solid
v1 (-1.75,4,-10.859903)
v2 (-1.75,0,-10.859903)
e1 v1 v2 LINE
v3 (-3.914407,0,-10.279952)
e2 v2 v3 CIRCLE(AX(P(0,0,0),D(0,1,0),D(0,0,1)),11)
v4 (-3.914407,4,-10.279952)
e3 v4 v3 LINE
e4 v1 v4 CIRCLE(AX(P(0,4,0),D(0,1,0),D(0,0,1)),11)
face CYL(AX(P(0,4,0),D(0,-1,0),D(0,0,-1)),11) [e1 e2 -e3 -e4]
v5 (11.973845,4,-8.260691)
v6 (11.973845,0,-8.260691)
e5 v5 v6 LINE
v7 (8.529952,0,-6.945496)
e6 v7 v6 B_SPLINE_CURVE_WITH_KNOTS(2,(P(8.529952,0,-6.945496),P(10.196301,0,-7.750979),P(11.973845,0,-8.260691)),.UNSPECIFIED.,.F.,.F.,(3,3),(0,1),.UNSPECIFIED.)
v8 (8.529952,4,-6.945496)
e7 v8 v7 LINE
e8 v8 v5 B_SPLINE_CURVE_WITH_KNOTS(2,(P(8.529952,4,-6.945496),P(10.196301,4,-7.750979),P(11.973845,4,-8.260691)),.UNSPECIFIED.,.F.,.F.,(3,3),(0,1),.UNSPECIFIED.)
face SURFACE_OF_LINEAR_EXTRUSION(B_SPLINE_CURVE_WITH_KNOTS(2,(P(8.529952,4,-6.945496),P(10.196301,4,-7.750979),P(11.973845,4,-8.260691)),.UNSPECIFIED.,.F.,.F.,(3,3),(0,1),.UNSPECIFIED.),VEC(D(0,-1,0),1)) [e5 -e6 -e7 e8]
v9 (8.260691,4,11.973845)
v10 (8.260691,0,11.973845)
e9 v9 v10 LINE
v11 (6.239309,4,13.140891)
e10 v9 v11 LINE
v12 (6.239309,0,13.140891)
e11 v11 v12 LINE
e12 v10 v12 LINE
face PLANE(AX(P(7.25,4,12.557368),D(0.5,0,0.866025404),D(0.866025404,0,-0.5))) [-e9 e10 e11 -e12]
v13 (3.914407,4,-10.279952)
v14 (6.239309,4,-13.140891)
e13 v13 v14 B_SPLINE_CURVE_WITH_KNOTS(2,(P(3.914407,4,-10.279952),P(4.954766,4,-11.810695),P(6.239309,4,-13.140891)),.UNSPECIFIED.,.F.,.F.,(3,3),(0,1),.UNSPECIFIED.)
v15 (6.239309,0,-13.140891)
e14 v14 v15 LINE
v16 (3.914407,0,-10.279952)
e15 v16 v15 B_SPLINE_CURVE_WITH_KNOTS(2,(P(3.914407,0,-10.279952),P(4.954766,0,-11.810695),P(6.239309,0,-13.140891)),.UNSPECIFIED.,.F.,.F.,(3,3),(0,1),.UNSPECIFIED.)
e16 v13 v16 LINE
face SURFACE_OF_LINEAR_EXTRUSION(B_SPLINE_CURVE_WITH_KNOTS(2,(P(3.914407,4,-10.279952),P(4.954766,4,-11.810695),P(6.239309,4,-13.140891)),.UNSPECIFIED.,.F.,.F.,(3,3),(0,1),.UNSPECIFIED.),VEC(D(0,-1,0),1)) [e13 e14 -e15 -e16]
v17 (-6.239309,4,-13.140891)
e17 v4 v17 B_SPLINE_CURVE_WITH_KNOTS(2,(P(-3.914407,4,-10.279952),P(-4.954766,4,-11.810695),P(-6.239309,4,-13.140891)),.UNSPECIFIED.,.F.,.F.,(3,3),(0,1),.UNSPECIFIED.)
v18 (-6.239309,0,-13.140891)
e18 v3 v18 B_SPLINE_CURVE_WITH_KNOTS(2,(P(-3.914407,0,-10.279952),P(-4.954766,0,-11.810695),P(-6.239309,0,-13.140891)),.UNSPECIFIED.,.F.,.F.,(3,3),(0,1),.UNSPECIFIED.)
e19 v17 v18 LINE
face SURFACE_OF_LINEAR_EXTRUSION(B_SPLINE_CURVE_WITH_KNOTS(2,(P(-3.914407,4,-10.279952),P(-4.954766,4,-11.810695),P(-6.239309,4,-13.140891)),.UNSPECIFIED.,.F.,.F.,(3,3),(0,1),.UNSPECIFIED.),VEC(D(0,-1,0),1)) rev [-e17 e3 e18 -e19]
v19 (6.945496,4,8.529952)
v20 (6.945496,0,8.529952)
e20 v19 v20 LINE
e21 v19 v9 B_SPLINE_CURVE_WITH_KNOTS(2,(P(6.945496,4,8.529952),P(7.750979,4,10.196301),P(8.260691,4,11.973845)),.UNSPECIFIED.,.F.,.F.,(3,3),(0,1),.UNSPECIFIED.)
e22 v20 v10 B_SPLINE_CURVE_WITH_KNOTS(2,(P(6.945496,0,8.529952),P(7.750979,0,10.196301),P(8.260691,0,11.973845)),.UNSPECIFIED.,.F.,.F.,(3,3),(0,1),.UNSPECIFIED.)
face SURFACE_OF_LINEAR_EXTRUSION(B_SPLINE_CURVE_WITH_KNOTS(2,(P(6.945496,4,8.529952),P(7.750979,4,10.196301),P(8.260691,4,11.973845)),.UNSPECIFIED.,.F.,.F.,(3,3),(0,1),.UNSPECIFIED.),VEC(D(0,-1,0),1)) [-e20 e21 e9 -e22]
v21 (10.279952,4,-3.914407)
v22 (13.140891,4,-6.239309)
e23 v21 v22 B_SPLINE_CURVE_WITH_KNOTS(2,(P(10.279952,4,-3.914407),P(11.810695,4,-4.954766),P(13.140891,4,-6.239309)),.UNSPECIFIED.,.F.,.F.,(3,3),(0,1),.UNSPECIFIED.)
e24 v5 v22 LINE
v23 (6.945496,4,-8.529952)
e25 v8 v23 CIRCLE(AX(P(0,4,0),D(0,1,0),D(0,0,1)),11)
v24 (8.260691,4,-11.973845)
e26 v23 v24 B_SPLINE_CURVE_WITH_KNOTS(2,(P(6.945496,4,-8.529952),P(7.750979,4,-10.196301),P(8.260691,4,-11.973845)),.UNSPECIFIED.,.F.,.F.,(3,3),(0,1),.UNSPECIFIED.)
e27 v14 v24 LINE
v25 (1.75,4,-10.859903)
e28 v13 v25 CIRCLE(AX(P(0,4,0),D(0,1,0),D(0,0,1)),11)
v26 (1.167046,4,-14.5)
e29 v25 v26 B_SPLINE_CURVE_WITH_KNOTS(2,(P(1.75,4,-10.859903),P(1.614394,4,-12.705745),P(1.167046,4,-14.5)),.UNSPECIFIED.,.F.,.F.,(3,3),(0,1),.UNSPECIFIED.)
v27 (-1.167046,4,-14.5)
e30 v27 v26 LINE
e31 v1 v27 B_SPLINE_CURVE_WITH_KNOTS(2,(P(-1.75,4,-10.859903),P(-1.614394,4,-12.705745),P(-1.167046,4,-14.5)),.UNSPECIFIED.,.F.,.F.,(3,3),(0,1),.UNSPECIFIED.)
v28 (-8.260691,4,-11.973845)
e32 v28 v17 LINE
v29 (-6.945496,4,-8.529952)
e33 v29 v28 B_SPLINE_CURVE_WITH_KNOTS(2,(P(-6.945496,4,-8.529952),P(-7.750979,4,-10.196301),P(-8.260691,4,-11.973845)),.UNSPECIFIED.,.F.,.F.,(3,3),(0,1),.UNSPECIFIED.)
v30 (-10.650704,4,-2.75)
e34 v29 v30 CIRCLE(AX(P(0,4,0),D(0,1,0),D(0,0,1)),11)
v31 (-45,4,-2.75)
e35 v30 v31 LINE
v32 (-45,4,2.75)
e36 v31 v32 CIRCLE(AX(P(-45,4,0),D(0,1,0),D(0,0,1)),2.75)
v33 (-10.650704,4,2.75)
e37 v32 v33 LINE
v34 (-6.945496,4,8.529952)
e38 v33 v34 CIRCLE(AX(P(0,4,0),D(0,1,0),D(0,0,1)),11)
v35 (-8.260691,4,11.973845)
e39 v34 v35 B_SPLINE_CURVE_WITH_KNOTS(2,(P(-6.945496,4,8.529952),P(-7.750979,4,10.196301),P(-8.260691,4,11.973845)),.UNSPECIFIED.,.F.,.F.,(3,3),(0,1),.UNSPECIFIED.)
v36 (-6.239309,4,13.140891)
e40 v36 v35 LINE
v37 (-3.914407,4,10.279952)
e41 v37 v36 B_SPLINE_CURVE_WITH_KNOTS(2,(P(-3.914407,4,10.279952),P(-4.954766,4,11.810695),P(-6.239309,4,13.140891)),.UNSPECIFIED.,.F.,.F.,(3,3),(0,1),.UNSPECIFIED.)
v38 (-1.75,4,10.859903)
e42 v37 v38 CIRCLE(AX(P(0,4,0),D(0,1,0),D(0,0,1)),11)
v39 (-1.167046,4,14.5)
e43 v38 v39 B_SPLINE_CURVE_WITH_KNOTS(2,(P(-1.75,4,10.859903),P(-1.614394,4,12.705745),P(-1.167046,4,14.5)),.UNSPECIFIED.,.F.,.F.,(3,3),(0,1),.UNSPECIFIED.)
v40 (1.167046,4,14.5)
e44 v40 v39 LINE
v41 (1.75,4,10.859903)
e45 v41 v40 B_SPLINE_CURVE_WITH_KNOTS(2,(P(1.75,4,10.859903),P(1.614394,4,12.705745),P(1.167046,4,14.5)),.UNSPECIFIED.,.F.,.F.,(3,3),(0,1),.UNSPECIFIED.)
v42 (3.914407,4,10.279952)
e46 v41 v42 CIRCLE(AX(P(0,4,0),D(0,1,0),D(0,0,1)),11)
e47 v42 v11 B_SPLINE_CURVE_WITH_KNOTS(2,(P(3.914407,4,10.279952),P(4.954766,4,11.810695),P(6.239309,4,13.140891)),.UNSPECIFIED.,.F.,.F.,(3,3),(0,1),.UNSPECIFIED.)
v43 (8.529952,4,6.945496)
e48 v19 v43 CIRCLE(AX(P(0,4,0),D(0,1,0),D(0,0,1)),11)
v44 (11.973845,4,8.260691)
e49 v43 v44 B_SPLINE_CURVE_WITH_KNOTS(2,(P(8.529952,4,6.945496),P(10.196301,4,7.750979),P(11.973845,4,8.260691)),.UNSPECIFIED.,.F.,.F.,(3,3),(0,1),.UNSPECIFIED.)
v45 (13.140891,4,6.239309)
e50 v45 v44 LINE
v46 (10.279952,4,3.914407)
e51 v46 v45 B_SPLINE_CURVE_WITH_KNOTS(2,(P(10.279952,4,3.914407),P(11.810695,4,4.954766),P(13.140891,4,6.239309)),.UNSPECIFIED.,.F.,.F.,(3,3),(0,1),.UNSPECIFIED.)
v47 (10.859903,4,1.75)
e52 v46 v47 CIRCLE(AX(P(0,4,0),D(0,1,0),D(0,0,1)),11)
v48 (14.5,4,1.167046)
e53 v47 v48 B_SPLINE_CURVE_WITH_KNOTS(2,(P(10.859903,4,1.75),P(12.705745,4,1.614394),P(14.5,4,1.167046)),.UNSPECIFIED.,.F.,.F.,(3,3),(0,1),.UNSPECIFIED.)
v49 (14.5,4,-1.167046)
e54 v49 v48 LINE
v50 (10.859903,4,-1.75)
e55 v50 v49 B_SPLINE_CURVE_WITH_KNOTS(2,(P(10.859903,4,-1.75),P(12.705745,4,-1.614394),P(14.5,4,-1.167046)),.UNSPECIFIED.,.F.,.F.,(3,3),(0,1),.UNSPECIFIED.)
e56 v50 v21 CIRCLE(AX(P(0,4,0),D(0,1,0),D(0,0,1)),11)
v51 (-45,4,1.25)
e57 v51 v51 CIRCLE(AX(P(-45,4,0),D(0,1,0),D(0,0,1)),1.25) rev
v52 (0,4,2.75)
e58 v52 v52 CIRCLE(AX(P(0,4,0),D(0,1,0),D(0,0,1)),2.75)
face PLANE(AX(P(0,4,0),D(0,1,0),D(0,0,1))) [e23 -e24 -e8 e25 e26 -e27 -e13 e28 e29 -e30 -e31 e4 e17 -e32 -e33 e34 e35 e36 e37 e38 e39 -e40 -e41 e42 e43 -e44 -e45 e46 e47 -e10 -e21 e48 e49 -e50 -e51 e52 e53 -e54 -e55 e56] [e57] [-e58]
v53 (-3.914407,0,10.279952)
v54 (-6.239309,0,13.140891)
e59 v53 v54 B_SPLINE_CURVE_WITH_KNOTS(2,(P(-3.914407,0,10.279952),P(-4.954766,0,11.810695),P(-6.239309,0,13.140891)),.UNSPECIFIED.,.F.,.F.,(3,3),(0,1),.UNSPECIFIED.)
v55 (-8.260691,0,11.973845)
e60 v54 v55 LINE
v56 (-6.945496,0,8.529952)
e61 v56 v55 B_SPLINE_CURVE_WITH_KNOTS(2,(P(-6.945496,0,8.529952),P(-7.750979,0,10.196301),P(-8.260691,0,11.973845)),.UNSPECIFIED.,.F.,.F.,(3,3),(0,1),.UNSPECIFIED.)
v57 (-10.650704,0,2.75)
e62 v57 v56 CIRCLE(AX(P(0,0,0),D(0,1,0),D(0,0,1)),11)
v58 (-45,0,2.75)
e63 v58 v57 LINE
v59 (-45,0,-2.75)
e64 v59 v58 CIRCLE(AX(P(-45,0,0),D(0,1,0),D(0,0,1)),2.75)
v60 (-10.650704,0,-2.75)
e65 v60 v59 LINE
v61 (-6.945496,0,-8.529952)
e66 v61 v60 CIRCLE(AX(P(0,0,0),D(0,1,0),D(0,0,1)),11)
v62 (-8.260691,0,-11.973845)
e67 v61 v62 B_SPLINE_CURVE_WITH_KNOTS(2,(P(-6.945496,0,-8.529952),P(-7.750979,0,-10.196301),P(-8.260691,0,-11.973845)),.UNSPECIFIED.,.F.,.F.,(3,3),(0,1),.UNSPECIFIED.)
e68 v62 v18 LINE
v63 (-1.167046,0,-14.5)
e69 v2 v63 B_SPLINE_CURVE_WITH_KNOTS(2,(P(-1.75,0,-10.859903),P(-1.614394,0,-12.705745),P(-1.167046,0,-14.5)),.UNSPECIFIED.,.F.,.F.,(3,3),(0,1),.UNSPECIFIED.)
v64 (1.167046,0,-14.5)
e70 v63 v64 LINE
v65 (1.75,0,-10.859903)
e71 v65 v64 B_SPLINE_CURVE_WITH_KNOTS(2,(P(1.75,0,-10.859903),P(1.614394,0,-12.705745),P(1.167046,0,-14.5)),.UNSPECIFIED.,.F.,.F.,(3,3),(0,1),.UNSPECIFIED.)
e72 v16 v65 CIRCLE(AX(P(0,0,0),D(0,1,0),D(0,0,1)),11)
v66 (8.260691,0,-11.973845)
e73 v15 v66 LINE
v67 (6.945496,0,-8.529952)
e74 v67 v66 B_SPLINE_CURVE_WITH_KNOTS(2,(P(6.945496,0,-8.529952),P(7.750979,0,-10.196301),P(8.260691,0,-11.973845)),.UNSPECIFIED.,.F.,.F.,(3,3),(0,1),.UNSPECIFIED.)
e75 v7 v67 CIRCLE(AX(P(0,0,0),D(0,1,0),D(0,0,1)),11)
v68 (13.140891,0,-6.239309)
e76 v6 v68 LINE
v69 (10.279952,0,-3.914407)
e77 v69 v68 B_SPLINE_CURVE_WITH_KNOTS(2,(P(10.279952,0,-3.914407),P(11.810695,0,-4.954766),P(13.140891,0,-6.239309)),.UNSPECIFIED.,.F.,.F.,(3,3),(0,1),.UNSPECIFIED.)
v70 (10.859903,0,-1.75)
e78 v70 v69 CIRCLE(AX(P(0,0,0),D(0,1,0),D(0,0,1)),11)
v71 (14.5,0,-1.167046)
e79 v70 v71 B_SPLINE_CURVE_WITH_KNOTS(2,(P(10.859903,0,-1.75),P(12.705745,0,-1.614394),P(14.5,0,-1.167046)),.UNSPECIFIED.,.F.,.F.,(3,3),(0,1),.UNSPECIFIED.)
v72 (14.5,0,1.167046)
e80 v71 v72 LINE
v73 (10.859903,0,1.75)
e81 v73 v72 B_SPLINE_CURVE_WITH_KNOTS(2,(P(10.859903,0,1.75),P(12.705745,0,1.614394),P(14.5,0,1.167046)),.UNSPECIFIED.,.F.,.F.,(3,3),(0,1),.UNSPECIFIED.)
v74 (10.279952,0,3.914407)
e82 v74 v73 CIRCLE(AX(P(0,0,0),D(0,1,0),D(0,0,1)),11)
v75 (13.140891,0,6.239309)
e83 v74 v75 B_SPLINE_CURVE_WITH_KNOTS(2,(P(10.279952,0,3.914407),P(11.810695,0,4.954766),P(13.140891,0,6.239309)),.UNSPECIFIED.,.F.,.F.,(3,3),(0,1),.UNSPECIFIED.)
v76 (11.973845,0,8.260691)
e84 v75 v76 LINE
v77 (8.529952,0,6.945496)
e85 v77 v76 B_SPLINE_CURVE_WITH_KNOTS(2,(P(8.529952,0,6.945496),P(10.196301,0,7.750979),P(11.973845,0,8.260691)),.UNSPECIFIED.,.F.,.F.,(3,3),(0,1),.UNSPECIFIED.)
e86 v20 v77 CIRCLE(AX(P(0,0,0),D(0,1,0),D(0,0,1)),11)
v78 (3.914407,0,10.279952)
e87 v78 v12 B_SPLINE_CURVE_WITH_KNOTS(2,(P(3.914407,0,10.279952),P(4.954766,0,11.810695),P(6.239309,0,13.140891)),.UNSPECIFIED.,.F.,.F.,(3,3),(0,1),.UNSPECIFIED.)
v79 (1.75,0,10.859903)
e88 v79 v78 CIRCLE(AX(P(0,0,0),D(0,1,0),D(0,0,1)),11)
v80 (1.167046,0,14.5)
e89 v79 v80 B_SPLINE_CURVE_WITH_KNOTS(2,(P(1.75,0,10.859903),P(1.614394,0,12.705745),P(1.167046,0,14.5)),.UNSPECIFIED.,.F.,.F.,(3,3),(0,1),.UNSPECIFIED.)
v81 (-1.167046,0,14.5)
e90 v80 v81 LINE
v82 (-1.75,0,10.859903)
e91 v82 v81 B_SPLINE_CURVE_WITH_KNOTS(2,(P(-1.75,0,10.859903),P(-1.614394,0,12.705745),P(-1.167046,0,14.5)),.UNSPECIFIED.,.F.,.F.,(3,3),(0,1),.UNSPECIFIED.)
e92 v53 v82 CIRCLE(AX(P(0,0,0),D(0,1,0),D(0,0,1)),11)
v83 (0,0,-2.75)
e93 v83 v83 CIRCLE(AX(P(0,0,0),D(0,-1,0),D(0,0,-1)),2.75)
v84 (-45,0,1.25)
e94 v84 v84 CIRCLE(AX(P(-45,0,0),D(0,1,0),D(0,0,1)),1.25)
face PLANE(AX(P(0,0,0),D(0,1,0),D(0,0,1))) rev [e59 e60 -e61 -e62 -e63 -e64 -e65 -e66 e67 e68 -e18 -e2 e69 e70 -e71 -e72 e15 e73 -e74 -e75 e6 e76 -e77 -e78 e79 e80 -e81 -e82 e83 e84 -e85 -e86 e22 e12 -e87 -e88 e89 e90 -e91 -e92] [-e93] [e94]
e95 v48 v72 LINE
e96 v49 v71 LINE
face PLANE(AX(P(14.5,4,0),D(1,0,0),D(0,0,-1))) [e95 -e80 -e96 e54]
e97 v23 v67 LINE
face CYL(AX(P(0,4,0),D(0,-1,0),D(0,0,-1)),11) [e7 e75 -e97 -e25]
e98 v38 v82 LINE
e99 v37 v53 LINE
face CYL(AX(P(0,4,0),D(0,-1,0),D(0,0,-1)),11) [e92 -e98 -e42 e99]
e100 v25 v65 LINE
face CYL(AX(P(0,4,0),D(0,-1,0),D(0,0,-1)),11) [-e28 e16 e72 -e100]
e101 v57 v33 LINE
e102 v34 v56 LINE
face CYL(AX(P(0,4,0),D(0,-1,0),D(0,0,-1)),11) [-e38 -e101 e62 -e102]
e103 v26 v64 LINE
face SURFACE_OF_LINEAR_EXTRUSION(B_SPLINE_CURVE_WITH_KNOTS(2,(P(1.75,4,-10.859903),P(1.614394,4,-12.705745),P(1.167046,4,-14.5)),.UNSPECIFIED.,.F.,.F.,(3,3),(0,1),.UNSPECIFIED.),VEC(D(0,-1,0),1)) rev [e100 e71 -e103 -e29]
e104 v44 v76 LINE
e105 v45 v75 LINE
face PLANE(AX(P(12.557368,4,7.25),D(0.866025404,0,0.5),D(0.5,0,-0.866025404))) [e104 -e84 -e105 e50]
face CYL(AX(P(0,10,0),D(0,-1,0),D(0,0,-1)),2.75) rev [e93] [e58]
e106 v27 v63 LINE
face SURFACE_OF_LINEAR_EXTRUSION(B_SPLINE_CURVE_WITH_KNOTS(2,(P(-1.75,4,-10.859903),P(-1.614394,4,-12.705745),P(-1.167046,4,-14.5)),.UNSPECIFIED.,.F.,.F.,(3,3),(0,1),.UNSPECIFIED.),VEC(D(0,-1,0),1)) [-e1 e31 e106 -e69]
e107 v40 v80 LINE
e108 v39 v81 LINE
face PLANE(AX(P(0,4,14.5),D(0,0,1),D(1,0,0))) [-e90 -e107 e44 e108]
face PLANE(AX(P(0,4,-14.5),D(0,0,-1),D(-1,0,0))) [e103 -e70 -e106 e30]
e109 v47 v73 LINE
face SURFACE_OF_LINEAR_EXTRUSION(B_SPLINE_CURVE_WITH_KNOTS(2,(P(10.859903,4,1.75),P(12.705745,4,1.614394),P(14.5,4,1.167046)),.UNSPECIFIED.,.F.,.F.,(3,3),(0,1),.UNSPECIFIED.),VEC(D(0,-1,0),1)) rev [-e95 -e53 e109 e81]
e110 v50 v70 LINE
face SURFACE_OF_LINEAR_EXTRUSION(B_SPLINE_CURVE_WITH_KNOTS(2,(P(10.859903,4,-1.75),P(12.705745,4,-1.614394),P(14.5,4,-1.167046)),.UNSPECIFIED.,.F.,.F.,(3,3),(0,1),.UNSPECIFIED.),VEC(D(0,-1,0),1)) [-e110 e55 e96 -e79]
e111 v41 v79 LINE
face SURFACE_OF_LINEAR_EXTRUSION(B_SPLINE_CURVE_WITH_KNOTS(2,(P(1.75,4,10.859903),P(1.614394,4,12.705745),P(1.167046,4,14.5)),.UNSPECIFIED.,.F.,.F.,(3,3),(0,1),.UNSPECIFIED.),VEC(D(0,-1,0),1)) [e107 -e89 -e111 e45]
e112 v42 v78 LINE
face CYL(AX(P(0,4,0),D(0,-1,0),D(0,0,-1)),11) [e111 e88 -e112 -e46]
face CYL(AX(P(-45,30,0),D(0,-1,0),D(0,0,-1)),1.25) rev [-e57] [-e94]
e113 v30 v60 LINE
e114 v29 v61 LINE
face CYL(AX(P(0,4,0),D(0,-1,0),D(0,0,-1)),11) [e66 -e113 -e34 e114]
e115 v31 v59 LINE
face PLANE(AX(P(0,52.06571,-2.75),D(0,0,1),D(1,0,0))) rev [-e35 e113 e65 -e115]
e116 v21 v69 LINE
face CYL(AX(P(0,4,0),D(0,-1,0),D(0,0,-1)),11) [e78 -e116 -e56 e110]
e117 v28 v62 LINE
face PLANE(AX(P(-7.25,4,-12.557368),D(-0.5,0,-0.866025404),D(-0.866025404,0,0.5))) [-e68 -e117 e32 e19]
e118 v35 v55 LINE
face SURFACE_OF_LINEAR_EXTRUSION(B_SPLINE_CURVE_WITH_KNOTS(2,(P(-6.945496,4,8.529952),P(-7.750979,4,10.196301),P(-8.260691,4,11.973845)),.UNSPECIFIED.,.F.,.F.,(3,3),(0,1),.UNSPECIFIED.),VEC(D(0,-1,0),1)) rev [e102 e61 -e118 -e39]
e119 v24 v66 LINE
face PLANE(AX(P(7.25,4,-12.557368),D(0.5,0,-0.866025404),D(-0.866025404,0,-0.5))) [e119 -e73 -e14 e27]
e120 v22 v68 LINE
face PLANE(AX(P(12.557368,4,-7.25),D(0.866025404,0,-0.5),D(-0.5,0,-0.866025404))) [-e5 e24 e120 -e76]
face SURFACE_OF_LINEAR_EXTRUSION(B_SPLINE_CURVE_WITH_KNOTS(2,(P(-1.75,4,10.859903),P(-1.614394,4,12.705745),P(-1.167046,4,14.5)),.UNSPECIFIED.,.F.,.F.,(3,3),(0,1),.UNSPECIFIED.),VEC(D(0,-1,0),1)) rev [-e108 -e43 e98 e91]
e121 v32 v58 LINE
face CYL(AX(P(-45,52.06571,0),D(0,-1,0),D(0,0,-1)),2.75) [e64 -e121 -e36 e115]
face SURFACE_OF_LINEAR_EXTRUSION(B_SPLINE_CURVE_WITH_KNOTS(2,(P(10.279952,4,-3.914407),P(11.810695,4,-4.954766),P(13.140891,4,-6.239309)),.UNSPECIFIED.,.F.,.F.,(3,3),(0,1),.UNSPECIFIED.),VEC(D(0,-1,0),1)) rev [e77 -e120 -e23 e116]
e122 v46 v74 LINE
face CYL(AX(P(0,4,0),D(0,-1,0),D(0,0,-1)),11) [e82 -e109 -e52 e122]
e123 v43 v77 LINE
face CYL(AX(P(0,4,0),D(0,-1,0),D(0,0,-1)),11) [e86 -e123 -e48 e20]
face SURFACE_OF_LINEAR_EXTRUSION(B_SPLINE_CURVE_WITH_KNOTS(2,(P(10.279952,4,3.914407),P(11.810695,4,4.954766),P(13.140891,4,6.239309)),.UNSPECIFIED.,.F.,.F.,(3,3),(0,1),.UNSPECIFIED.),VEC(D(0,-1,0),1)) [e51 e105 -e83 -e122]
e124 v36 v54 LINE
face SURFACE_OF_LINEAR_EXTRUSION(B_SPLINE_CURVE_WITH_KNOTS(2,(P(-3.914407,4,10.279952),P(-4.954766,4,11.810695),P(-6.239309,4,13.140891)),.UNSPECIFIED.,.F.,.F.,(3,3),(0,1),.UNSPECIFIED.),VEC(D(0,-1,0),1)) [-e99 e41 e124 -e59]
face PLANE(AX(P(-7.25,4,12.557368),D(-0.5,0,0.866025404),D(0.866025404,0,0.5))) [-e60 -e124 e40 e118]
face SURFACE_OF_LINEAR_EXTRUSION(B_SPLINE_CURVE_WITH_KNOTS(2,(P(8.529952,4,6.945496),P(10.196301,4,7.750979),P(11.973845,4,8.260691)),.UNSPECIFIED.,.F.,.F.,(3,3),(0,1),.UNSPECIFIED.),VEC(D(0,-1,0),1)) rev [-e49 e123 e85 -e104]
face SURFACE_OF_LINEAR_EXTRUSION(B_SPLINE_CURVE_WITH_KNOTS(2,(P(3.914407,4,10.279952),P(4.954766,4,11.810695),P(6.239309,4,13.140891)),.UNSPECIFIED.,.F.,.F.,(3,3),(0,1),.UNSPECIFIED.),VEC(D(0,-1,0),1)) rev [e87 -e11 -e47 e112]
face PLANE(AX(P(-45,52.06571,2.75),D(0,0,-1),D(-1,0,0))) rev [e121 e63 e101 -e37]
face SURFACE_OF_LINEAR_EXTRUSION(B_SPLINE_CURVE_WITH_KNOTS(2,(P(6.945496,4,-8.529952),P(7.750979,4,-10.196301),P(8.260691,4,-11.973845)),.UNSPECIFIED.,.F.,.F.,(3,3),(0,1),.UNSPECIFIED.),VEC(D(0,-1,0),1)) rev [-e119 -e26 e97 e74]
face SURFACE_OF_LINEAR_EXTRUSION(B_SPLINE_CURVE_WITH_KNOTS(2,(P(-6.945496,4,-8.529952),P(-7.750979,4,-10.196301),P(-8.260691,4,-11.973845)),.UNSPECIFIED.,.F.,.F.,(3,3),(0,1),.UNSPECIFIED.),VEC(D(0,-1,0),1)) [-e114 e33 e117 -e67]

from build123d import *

# Parameters (mm, degrees)
BOSS_EXTRUDE1_DEPTH            = 4
BOSS_EXTRUDE1_2_DEPTH          = 4
SKETCH3_R                      = 2.75
CUT_EXTRUDE5_DEPTH             = 10
BOSS_EXTRUDE2_DEPTH            = 4
SKETCH6_R                      = 1.25
CUT_EXTRUDE4_DEPTH             = 30
BODY_DELETE_KEEP_2_OUTLINE_R   = 2.75
BODY_DELETE_KEEP_2_OUTLINE_R_2 = 1.25
BODY_DELETE_KEEP_2_DEPTH       = 4


# Read off the part's stored shape, not the designer's step: Body-Delete/Keep 2
with BuildPart() as part:
    # Sketch1 → Boss-Extrude1 (new body)
    with BuildSketch(Plane(origin=(0, 0, 0), x_dir=(1, 0, 0), z_dir=(0, 1, 0))):
        with BuildLine():
            Line((1.167045764, 14.5), (-1.167045764, 14.5))
            add(Edge.make_bspline(
                [(-1.75, 10.859903314), (-1.614394474, 12.705744996), (-1.167045764, 14.5)],
                knots=[0, 0, 0, 1, 1, 1], degree=2))
            ThreePointArc((-1.75, 10.859903314), (-2.847009496, 10.625184089), (-3.914407201, 10.279952153))
            add(Edge.make_bspline(
                [(-3.914407201, 10.279952153), (-4.954765872, 11.810695178), (-6.239308721, 13.140891237)],
                knots=[0, 0, 0, 1, 1, 1], degree=2))
            Line((-6.239308721, 13.140891237), (-8.260691279, 11.973845473))
            add(Edge.make_bspline(
                [(-6.945496114, 8.529952153), (-7.750979124, 10.196300704), (-8.260691279, 11.973845473)],
                knots=[0, 0, 0, 1, 1, 1], degree=2))
            ThreePointArc((-6.945496114, 8.529952153), (-11, 0), (-6.945496114, -8.529952153))
            add(Edge.make_bspline(
                [(-6.945496114, -8.529952153), (-7.750979124, -10.196300704), (-8.260691279, -11.973845473)],
                knots=[0, 0, 0, 1, 1, 1], degree=2))
            Line((-8.260691279, -11.973845473), (-6.239308721, -13.140891237))
            add(Edge.make_bspline(
                [(-3.914407201, -10.279952153), (-4.954765872, -11.810695178), (-6.239308721, -13.140891237)],
                knots=[0, 0, 0, 1, 1, 1], degree=2))
            ThreePointArc((-3.914407201, -10.279952153), (-2.847009496, -10.625184089), (-1.75, -10.859903314))
            add(Edge.make_bspline(
                [(-1.75, -10.859903314), (-1.614394474, -12.705744996), (-1.167045764, -14.5)],
                knots=[0, 0, 0, 1, 1, 1], degree=2))
            Line((-1.167045764, -14.5), (1.167045764, -14.5))
            add(Edge.make_bspline(
                [(1.75, -10.859903314), (1.614394474, -12.705744996), (1.167045764, -14.5)],
                knots=[0, 0, 0, 1, 1, 1], degree=2))
            ThreePointArc((1.75, -10.859903314), (2.847009496, -10.625184089), (3.914407201, -10.279952153))
            add(Edge.make_bspline(
                [(3.914407201, -10.279952153), (4.954765872, -11.810695178), (6.239308721, -13.140891237)],
                knots=[0, 0, 0, 1, 1, 1], degree=2))
            Line((6.239308721, -13.140891237), (8.260691279, -11.973845473))
            add(Edge.make_bspline(
                [(6.945496114, -8.529952153), (7.750979124, -10.196300704), (8.260691279, -11.973845473)],
                knots=[0, 0, 0, 1, 1, 1], degree=2))
            ThreePointArc((6.945496114, -8.529952153), (7.778174593, -7.778174593), (8.529952153, -6.945496114))
            add(Edge.make_bspline(
                [(8.529952153, -6.945496114), (10.196300704, -7.750979124), (11.973845473, -8.260691279)],
                knots=[0, 0, 0, 1, 1, 1], degree=2))
            Line((11.973845473, -8.260691279), (13.140891237, -6.239308721))
            add(Edge.make_bspline(
                [(10.279952153, -3.914407201), (11.810695178, -4.954765872), (13.140891237, -6.239308721)],
                knots=[0, 0, 0, 1, 1, 1], degree=2))
            ThreePointArc((10.279952153, -3.914407201), (10.625184089, -2.847009496), (10.859903314, -1.75))
            add(Edge.make_bspline(
                [(10.859903314, -1.75), (12.705744996, -1.614394474), (14.5, -1.167045764)],
                knots=[0, 0, 0, 1, 1, 1], degree=2))
            Line((14.5, -1.167045764), (14.5, 1.167045764))
            add(Edge.make_bspline(
                [(10.859903314, 1.75), (12.705744996, 1.614394474), (14.5, 1.167045764)],
                knots=[0, 0, 0, 1, 1, 1], degree=2))
            ThreePointArc((10.859903314, 1.75), (10.625184089, 2.847009496), (10.279952153, 3.914407201))
            add(Edge.make_bspline(
                [(10.279952153, 3.914407201), (11.810695178, 4.954765872), (13.140891237, 6.239308721)],
                knots=[0, 0, 0, 1, 1, 1], degree=2))
            Line((13.140891237, 6.239308721), (11.973845473, 8.260691279))
            add(Edge.make_bspline(
                [(8.529952153, 6.945496114), (10.196300704, 7.750979124), (11.973845473, 8.260691279)],
                knots=[0, 0, 0, 1, 1, 1], degree=2))
            ThreePointArc((8.529952153, 6.945496114), (7.778174593, 7.778174593), (6.945496114, 8.529952153))
            add(Edge.make_bspline(
                [(6.945496114, 8.529952153), (7.750979124, 10.196300704), (8.260691279, 11.973845473)],
                knots=[0, 0, 0, 1, 1, 1], degree=2))
            Line((8.260691279, 11.973845473), (6.239308721, 13.140891237))
            add(Edge.make_bspline(
                [(3.914407201, 10.279952153), (4.954765872, 11.810695178), (6.239308721, 13.140891237)],
                knots=[0, 0, 0, 1, 1, 1], degree=2))
            ThreePointArc((3.914407201, 10.279952153), (2.847009496, 10.625184089), (1.75, 10.859903314))
            add(Edge.make_bspline(
                [(1.75, 10.859903314), (1.614394474, 12.705744996), (1.167045764, 14.5)],
                knots=[0, 0, 0, 1, 1, 1], degree=2))
        make_face()
    extrude(amount=BOSS_EXTRUDE1_DEPTH)


with BuildPart() as body_2:
    # Sketch1 → Boss-Extrude1 2 (new body)
    with BuildSketch(Plane(origin=(0, 0, 0), x_dir=(1, 0, 0), z_dir=(0, 1, 0))):
        with BuildLine():
            add(Edge.make_bspline(
                [(34.870054214, 9.863192787), (35.186170623, 11.683486975), (35.362460844, 13.522249764)],
                knots=[0, 0, 0, 1, 1, 1], degree=2))
            Line((35.362460844, 13.522249764), (33.134723393, 14.204954567))
            add(Edge.make_bspline(
                [(31.5252137, 10.893746976), (32.106045864, 12.660345794), (33.134723393, 14.204954567)],
                knots=[0, 0, 0, 1, 1, 1], degree=2))
            ThreePointArc((31.5252137, 10.893746976), (30.40772436, 10.992441078), (29.285994273, 10.976802623))
            add(Edge.make_bspline(
                [(29.285994273, 10.976802623), (28.64961202, 12.711281837), (27.882902436, 14.391842235)],
                knots=[0, 0, 0, 1, 1, 1], degree=2))
            Line((27.882902436, 14.391842235), (25.612272809, 13.869213211))
            add(Edge.make_bspline(
                [(25.874000322, 10.196868473), (25.493716323, 12.01720401), (25.612272809, 13.869213211)],
                knots=[0, 0, 0, 1, 1, 1], degree=2))
            ThreePointArc((25.874000322, 10.196868473), (24.856879115, 9.723595403), (23.893251591, 9.14918706))
            add(Edge.make_bspline(
                [(23.893251591, 9.14918706), (22.474888786, 10.333098996), (20.97061861, 11.4051522)],
                knots=[0, 0, 0, 1, 1, 1], degree=2))
            Line((20.97061861, 11.4051522), (19.265510182, 9.817227376))
            add(Edge.make_bspline(
                [(21.328345227, 6.767747298), (20.088841854, 8.154062117), (19.265510182, 9.817227376)],
                knots=[0, 0, 0, 1, 1, 1], degree=2))
            ThreePointArc((21.328345227, 6.767747298), (20.684128957, 5.849320193), (20.136807213, 4.870054214))
            add(Edge.make_bspline(
                [(20.136807213, 4.870054214), (18.316513025, 5.186170623), (16.477750236, 5.362460844)],
                knots=[0, 0, 0, 1, 1, 1], degree=2))
            Line((16.477750236, 5.362460844), (15.795045433, 3.134723393))
            add(Edge.make_bspline(
                [(19.106253024, 1.5252137), (17.339654206, 2.106045864), (15.795045433, 3.134723393)],
                knots=[0, 0, 0, 1, 1, 1], degree=2))
            ThreePointArc((19.106253024, 1.5252137), (19.007558922, 0.40772436), (19.023197377, -0.714005727))
            add(Edge.make_bspline(
                [(19.023197377, -0.714005727), (17.288718163, -1.35038798), (15.608157765, -2.117097564)],
                knots=[0, 0, 0, 1, 1, 1], degree=2))
            Line((15.608157765, -2.117097564), (16.130786789, -4.387727191))
            add(Edge.make_bspline(
                [(19.803131527, -4.125999678), (17.98279599, -4.506283677), (16.130786789, -4.387727191)],
                knots=[0, 0, 0, 1, 1, 1], degree=2))
            ThreePointArc((19.803131527, -4.125999678), (20.276404597, -5.143120885), (20.85081294, -6.106748409))
            add(Edge.make_bspline(
                [(20.85081294, -6.106748409), (19.666901004, -7.525111214), (18.5948478, -9.02938139)],
                knots=[0, 0, 0, 1, 1, 1], degree=2))
            Line((18.5948478, -9.02938139), (20.182772624, -10.734489818))
            add(Edge.make_bspline(
                [(23.232252702, -8.671654773), (21.845937883, -9.911158146), (20.182772624, -10.734489818)],
                knots=[0, 0, 0, 1, 1, 1], degree=2))
            ThreePointArc((23.232252702, -8.671654773), (24.150679807, -9.315871043), (25.129945786, -9.863192787))
            add(Edge.make_bspline(
                [(25.129945786, -9.863192787), (24.813829377, -11.683486975), (24.637539156, -13.522249764)],
                knots=[0, 0, 0, 1, 1, 1], degree=2))
            Line((24.637539156, -13.522249764), (26.865276607, -14.204954567))
            add(Edge.make_bspline(
                [(28.4747863, -10.893746976), (27.893954136, -12.660345794), (26.865276607, -14.204954567)],
                knots=[0, 0, 0, 1, 1, 1], degree=2))
            ThreePointArc((28.4747863, -10.893746976), (29.59227564, -10.992441078), (30.714005727, -10.976802623))
            add(Edge.make_bspline(
                [(30.714005727, -10.976802623), (31.35038798, -12.711281837), (32.117097564, -14.391842235)],
                knots=[0, 0, 0, 1, 1, 1], degree=2))
            Line((32.117097564, -14.391842235), (34.387727191, -13.869213211))
            add(Edge.make_bspline(
                [(34.125999678, -10.196868473), (34.506283677, -12.01720401), (34.387727191, -13.869213211)],
                knots=[0, 0, 0, 1, 1, 1], degree=2))
            ThreePointArc((34.125999678, -10.196868473), (35.143120885, -9.723595403), (36.106748409, -9.14918706))
            add(Edge.make_bspline(
                [(36.106748409, -9.14918706), (37.525111214, -10.333098996), (39.02938139, -11.4051522)],
                knots=[0, 0, 0, 1, 1, 1], degree=2))
            Line((39.02938139, -11.4051522), (40.734489818, -9.817227376))
            add(Edge.make_bspline(
                [(38.671654773, -6.767747298), (39.911158146, -8.154062117), (40.734489818, -9.817227376)],
                knots=[0, 0, 0, 1, 1, 1], degree=2))
            ThreePointArc((38.671654773, -6.767747298), (40.723409561, 2.451221613), (34.870054214, 9.863192787))
        make_face()
    extrude(amount=BOSS_EXTRUDE1_2_DEPTH)


with BuildPart() as cut_extrude5_tool:
    # Sketch3 → Cut-Extrude5 (new body)
    with BuildSketch(Plane(origin=(0, 0, 0), x_dir=(-1, 0, 0), z_dir=(0, -1, 0))):
        with Locations(Location((0, 0, 0), (0, 0, 90))):
            Circle(SKETCH3_R)
        with Locations(Location((-30, 0, 0), (0, 0, 90))):
            Circle(SKETCH3_R)
    extrude(amount=-CUT_EXTRUDE5_DEPTH)


with BuildPart() as part_1:
    add(part.part)

    # Cut-Extrude5: cut by cut_extrude5_tool
    add(cut_extrude5_tool.part, mode=Mode.SUBTRACT)



with BuildPart() as body_2_1:
    add(body_2.part)

    # Cut-Extrude5: cut by cut_extrude5_tool
    add(cut_extrude5_tool.part, mode=Mode.SUBTRACT)


with BuildPart() as part_2:
    add(part_1.part)

    add(body_2_1.part)  # Boss-Extrude2 merges body 2
    # Sketch4 → Boss-Extrude2 (add)
    with BuildSketch(Plane(origin=(0, 0, 0), x_dir=(1, 0, 0), z_dir=(0, 1, 0))):
        with BuildLine():
            Line((0, 2.75), (-45, 2.75))
            ThreePointArc((-45, 2.75), (-47.75, 0), (-45, -2.75))
            Line((-45, -2.75), (0, -2.75))
            ThreePointArc((0, -2.75), (-2.75, 0), (0, 2.75))
        make_face()
        with BuildLine():
            Line((75, -2.75), (30, -2.75))
            ThreePointArc((30, -2.75), (32.75, 0), (30, 2.75))
            Line((30, 2.75), (75, 2.75))
            ThreePointArc((75, 2.75), (77.75, 0), (75, -2.75))
        make_face()
    extrude(amount=BOSS_EXTRUDE2_DEPTH)

    # Sketch6 → Cut-Extrude4 (cut)
    with BuildSketch(Plane(origin=(0, 0, 0), x_dir=(1, 0, 0), z_dir=(0, 1, 0))):
        with Locations(Location((-45, 0, 0), (0, 0, 270))):
            Circle(SKETCH6_R)
        with Locations(Location((75, 0, 0), (0, 0, 270))):
            Circle(SKETCH6_R)
    extrude(amount=CUT_EXTRUDE4_DEPTH, mode=Mode.SUBTRACT)

    # Body-Delete/Keep 2 outline → Body-Delete/Keep 2 (cut)
    with BuildSketch(Plane(origin=(0, 0, 0), x_dir=(1, 0, 0), z_dir=(0, 1, 0))):
        with BuildLine():
            ThreePointArc((25.874000322, 10.196868473), (24.856879115, 9.723595403), (23.893251591, 9.14918706))
            add(Edge.make_bspline(
                [(23.893251591, 9.14918706), (22.474888786, 10.333098996), (20.97061861, 11.4051522)],
                knots=[0, 0, 0, 1, 1, 1], degree=2))
            Line((20.97061861, 11.4051522), (19.265510182, 9.817227376))
            add(Edge.make_bspline(
                [(21.328345227, 6.767747298), (20.088841854, 8.154062117), (19.265510182, 9.817227376)],
                knots=[0, 0, 0, 1, 1, 1], degree=2))
            ThreePointArc((21.328345227, 6.767747298), (20.684128957, 5.849320193), (20.136807213, 4.870054214))
            add(Edge.make_bspline(
                [(20.136807213, 4.870054214), (18.316513025, 5.186170623), (16.477750236, 5.362460844)],
                knots=[0, 0, 0, 1, 1, 1], degree=2))
            Line((16.477750236, 5.362460844), (15.795045433, 3.134723393))
            add(Edge.make_bspline(
                [(19.106253024, 1.5252137), (17.339654206, 2.106045864), (15.795045433, 3.134723393)],
                knots=[0, 0, 0, 1, 1, 1], degree=2))
            ThreePointArc((19.106253024, 1.5252137), (19.007558922, 0.40772436), (19.023197377, -0.714005727))
            add(Edge.make_bspline(
                [(19.023197377, -0.714005727), (17.288718163, -1.35038798), (15.608157765, -2.117097564)],
                knots=[0, 0, 0, 1, 1, 1], degree=2))
            Line((15.608157765, -2.117097564), (16.130786789, -4.387727191))
            add(Edge.make_bspline(
                [(19.803131527, -4.125999678), (17.98279599, -4.506283677), (16.130786789, -4.387727191)],
                knots=[0, 0, 0, 1, 1, 1], degree=2))
            ThreePointArc((19.803131527, -4.125999678), (20.276404597, -5.143120885), (20.85081294, -6.106748409))
            add(Edge.make_bspline(
                [(20.85081294, -6.106748409), (19.666901004, -7.525111214), (18.5948478, -9.02938139)],
                knots=[0, 0, 0, 1, 1, 1], degree=2))
            Line((18.5948478, -9.02938139), (20.182772624, -10.734489818))
            add(Edge.make_bspline(
                [(23.232252702, -8.671654773), (21.845937883, -9.911158146), (20.182772624, -10.734489818)],
                knots=[0, 0, 0, 1, 1, 1], degree=2))
            ThreePointArc((23.232252702, -8.671654773), (24.150679807, -9.315871043), (25.129945786, -9.863192787))
            add(Edge.make_bspline(
                [(25.129945786, -9.863192787), (24.813829377, -11.683486975), (24.637539156, -13.522249764)],
                knots=[0, 0, 0, 1, 1, 1], degree=2))
            Line((24.637539156, -13.522249764), (26.865276607, -14.204954567))
            add(Edge.make_bspline(
                [(28.4747863, -10.893746976), (27.893954136, -12.660345794), (26.865276607, -14.204954567)],
                knots=[0, 0, 0, 1, 1, 1], degree=2))
            ThreePointArc((28.4747863, -10.893746976), (29.59227564, -10.992441078), (30.714005727, -10.976802623))
            add(Edge.make_bspline(
                [(30.714005727, -10.976802623), (31.35038798, -12.711281837), (32.117097564, -14.391842235)],
                knots=[0, 0, 0, 1, 1, 1], degree=2))
            Line((32.117097564, -14.391842235), (34.387727191, -13.869213211))
            add(Edge.make_bspline(
                [(34.125999678, -10.196868473), (34.506283677, -12.01720401), (34.387727191, -13.869213211)],
                knots=[0, 0, 0, 1, 1, 1], degree=2))
            ThreePointArc((34.125999678, -10.196868473), (35.143120885, -9.723595403), (36.106748409, -9.14918706))
            add(Edge.make_bspline(
                [(36.106748409, -9.14918706), (37.525111214, -10.333098996), (39.02938139, -11.4051522)],
                knots=[0, 0, 0, 1, 1, 1], degree=2))
            Line((39.02938139, -11.4051522), (40.734489818, -9.817227376))
            add(Edge.make_bspline(
                [(38.671654773, -6.767747298), (39.911158146, -8.154062117), (40.734489818, -9.817227376)],
                knots=[0, 0, 0, 1, 1, 1], degree=2))
            ThreePointArc((38.671654773, -6.767747298), (39.867824605, -4.860662256), (40.650704202, -2.75))
            Line((40.650704202, -2.75), (75, -2.75))
            ThreePointArc((75, -2.75), (77.75, 0), (75, 2.75))
            Line((75, 2.75), (40.650704202, 2.75))
            ThreePointArc((40.650704202, 2.75), (38.536560394, 6.93737246), (34.870054214, 9.863192787))
            add(Edge.make_bspline(
                [(34.870054214, 9.863192787), (35.186170623, 11.683486975), (35.362460844, 13.522249764)],
                knots=[0, 0, 0, 1, 1, 1], degree=2))
            Line((35.362460844, 13.522249764), (33.134723393, 14.204954567))
            add(Edge.make_bspline(
                [(31.5252137, 10.893746976), (32.106045864, 12.660345794), (33.134723393, 14.204954567)],
                knots=[0, 0, 0, 1, 1, 1], degree=2))
            ThreePointArc((31.5252137, 10.893746976), (30.40772436, 10.992441078), (29.285994273, 10.976802623))
            add(Edge.make_bspline(
                [(29.285994273, 10.976802623), (28.64961202, 12.711281837), (27.882902436, 14.391842235)],
                knots=[0, 0, 0, 1, 1, 1], degree=2))
            Line((27.882902436, 14.391842235), (25.612272809, 13.869213211))
            add(Edge.make_bspline(
                [(25.874000322, 10.196868473), (25.493716323, 12.01720401), (25.612272809, 13.869213211)],
                knots=[0, 0, 0, 1, 1, 1], degree=2))
        make_face()
        with Locations((30, 0)):
            Circle(BODY_DELETE_KEEP_2_OUTLINE_R, mode=Mode.SUBTRACT)
        with Locations((75, 0)):
            Circle(BODY_DELETE_KEEP_2_OUTLINE_R_2, mode=Mode.SUBTRACT)
    extrude(amount=BODY_DELETE_KEEP_2_DEPTH, mode=Mode.SUBTRACT)


solid = part_2.part
